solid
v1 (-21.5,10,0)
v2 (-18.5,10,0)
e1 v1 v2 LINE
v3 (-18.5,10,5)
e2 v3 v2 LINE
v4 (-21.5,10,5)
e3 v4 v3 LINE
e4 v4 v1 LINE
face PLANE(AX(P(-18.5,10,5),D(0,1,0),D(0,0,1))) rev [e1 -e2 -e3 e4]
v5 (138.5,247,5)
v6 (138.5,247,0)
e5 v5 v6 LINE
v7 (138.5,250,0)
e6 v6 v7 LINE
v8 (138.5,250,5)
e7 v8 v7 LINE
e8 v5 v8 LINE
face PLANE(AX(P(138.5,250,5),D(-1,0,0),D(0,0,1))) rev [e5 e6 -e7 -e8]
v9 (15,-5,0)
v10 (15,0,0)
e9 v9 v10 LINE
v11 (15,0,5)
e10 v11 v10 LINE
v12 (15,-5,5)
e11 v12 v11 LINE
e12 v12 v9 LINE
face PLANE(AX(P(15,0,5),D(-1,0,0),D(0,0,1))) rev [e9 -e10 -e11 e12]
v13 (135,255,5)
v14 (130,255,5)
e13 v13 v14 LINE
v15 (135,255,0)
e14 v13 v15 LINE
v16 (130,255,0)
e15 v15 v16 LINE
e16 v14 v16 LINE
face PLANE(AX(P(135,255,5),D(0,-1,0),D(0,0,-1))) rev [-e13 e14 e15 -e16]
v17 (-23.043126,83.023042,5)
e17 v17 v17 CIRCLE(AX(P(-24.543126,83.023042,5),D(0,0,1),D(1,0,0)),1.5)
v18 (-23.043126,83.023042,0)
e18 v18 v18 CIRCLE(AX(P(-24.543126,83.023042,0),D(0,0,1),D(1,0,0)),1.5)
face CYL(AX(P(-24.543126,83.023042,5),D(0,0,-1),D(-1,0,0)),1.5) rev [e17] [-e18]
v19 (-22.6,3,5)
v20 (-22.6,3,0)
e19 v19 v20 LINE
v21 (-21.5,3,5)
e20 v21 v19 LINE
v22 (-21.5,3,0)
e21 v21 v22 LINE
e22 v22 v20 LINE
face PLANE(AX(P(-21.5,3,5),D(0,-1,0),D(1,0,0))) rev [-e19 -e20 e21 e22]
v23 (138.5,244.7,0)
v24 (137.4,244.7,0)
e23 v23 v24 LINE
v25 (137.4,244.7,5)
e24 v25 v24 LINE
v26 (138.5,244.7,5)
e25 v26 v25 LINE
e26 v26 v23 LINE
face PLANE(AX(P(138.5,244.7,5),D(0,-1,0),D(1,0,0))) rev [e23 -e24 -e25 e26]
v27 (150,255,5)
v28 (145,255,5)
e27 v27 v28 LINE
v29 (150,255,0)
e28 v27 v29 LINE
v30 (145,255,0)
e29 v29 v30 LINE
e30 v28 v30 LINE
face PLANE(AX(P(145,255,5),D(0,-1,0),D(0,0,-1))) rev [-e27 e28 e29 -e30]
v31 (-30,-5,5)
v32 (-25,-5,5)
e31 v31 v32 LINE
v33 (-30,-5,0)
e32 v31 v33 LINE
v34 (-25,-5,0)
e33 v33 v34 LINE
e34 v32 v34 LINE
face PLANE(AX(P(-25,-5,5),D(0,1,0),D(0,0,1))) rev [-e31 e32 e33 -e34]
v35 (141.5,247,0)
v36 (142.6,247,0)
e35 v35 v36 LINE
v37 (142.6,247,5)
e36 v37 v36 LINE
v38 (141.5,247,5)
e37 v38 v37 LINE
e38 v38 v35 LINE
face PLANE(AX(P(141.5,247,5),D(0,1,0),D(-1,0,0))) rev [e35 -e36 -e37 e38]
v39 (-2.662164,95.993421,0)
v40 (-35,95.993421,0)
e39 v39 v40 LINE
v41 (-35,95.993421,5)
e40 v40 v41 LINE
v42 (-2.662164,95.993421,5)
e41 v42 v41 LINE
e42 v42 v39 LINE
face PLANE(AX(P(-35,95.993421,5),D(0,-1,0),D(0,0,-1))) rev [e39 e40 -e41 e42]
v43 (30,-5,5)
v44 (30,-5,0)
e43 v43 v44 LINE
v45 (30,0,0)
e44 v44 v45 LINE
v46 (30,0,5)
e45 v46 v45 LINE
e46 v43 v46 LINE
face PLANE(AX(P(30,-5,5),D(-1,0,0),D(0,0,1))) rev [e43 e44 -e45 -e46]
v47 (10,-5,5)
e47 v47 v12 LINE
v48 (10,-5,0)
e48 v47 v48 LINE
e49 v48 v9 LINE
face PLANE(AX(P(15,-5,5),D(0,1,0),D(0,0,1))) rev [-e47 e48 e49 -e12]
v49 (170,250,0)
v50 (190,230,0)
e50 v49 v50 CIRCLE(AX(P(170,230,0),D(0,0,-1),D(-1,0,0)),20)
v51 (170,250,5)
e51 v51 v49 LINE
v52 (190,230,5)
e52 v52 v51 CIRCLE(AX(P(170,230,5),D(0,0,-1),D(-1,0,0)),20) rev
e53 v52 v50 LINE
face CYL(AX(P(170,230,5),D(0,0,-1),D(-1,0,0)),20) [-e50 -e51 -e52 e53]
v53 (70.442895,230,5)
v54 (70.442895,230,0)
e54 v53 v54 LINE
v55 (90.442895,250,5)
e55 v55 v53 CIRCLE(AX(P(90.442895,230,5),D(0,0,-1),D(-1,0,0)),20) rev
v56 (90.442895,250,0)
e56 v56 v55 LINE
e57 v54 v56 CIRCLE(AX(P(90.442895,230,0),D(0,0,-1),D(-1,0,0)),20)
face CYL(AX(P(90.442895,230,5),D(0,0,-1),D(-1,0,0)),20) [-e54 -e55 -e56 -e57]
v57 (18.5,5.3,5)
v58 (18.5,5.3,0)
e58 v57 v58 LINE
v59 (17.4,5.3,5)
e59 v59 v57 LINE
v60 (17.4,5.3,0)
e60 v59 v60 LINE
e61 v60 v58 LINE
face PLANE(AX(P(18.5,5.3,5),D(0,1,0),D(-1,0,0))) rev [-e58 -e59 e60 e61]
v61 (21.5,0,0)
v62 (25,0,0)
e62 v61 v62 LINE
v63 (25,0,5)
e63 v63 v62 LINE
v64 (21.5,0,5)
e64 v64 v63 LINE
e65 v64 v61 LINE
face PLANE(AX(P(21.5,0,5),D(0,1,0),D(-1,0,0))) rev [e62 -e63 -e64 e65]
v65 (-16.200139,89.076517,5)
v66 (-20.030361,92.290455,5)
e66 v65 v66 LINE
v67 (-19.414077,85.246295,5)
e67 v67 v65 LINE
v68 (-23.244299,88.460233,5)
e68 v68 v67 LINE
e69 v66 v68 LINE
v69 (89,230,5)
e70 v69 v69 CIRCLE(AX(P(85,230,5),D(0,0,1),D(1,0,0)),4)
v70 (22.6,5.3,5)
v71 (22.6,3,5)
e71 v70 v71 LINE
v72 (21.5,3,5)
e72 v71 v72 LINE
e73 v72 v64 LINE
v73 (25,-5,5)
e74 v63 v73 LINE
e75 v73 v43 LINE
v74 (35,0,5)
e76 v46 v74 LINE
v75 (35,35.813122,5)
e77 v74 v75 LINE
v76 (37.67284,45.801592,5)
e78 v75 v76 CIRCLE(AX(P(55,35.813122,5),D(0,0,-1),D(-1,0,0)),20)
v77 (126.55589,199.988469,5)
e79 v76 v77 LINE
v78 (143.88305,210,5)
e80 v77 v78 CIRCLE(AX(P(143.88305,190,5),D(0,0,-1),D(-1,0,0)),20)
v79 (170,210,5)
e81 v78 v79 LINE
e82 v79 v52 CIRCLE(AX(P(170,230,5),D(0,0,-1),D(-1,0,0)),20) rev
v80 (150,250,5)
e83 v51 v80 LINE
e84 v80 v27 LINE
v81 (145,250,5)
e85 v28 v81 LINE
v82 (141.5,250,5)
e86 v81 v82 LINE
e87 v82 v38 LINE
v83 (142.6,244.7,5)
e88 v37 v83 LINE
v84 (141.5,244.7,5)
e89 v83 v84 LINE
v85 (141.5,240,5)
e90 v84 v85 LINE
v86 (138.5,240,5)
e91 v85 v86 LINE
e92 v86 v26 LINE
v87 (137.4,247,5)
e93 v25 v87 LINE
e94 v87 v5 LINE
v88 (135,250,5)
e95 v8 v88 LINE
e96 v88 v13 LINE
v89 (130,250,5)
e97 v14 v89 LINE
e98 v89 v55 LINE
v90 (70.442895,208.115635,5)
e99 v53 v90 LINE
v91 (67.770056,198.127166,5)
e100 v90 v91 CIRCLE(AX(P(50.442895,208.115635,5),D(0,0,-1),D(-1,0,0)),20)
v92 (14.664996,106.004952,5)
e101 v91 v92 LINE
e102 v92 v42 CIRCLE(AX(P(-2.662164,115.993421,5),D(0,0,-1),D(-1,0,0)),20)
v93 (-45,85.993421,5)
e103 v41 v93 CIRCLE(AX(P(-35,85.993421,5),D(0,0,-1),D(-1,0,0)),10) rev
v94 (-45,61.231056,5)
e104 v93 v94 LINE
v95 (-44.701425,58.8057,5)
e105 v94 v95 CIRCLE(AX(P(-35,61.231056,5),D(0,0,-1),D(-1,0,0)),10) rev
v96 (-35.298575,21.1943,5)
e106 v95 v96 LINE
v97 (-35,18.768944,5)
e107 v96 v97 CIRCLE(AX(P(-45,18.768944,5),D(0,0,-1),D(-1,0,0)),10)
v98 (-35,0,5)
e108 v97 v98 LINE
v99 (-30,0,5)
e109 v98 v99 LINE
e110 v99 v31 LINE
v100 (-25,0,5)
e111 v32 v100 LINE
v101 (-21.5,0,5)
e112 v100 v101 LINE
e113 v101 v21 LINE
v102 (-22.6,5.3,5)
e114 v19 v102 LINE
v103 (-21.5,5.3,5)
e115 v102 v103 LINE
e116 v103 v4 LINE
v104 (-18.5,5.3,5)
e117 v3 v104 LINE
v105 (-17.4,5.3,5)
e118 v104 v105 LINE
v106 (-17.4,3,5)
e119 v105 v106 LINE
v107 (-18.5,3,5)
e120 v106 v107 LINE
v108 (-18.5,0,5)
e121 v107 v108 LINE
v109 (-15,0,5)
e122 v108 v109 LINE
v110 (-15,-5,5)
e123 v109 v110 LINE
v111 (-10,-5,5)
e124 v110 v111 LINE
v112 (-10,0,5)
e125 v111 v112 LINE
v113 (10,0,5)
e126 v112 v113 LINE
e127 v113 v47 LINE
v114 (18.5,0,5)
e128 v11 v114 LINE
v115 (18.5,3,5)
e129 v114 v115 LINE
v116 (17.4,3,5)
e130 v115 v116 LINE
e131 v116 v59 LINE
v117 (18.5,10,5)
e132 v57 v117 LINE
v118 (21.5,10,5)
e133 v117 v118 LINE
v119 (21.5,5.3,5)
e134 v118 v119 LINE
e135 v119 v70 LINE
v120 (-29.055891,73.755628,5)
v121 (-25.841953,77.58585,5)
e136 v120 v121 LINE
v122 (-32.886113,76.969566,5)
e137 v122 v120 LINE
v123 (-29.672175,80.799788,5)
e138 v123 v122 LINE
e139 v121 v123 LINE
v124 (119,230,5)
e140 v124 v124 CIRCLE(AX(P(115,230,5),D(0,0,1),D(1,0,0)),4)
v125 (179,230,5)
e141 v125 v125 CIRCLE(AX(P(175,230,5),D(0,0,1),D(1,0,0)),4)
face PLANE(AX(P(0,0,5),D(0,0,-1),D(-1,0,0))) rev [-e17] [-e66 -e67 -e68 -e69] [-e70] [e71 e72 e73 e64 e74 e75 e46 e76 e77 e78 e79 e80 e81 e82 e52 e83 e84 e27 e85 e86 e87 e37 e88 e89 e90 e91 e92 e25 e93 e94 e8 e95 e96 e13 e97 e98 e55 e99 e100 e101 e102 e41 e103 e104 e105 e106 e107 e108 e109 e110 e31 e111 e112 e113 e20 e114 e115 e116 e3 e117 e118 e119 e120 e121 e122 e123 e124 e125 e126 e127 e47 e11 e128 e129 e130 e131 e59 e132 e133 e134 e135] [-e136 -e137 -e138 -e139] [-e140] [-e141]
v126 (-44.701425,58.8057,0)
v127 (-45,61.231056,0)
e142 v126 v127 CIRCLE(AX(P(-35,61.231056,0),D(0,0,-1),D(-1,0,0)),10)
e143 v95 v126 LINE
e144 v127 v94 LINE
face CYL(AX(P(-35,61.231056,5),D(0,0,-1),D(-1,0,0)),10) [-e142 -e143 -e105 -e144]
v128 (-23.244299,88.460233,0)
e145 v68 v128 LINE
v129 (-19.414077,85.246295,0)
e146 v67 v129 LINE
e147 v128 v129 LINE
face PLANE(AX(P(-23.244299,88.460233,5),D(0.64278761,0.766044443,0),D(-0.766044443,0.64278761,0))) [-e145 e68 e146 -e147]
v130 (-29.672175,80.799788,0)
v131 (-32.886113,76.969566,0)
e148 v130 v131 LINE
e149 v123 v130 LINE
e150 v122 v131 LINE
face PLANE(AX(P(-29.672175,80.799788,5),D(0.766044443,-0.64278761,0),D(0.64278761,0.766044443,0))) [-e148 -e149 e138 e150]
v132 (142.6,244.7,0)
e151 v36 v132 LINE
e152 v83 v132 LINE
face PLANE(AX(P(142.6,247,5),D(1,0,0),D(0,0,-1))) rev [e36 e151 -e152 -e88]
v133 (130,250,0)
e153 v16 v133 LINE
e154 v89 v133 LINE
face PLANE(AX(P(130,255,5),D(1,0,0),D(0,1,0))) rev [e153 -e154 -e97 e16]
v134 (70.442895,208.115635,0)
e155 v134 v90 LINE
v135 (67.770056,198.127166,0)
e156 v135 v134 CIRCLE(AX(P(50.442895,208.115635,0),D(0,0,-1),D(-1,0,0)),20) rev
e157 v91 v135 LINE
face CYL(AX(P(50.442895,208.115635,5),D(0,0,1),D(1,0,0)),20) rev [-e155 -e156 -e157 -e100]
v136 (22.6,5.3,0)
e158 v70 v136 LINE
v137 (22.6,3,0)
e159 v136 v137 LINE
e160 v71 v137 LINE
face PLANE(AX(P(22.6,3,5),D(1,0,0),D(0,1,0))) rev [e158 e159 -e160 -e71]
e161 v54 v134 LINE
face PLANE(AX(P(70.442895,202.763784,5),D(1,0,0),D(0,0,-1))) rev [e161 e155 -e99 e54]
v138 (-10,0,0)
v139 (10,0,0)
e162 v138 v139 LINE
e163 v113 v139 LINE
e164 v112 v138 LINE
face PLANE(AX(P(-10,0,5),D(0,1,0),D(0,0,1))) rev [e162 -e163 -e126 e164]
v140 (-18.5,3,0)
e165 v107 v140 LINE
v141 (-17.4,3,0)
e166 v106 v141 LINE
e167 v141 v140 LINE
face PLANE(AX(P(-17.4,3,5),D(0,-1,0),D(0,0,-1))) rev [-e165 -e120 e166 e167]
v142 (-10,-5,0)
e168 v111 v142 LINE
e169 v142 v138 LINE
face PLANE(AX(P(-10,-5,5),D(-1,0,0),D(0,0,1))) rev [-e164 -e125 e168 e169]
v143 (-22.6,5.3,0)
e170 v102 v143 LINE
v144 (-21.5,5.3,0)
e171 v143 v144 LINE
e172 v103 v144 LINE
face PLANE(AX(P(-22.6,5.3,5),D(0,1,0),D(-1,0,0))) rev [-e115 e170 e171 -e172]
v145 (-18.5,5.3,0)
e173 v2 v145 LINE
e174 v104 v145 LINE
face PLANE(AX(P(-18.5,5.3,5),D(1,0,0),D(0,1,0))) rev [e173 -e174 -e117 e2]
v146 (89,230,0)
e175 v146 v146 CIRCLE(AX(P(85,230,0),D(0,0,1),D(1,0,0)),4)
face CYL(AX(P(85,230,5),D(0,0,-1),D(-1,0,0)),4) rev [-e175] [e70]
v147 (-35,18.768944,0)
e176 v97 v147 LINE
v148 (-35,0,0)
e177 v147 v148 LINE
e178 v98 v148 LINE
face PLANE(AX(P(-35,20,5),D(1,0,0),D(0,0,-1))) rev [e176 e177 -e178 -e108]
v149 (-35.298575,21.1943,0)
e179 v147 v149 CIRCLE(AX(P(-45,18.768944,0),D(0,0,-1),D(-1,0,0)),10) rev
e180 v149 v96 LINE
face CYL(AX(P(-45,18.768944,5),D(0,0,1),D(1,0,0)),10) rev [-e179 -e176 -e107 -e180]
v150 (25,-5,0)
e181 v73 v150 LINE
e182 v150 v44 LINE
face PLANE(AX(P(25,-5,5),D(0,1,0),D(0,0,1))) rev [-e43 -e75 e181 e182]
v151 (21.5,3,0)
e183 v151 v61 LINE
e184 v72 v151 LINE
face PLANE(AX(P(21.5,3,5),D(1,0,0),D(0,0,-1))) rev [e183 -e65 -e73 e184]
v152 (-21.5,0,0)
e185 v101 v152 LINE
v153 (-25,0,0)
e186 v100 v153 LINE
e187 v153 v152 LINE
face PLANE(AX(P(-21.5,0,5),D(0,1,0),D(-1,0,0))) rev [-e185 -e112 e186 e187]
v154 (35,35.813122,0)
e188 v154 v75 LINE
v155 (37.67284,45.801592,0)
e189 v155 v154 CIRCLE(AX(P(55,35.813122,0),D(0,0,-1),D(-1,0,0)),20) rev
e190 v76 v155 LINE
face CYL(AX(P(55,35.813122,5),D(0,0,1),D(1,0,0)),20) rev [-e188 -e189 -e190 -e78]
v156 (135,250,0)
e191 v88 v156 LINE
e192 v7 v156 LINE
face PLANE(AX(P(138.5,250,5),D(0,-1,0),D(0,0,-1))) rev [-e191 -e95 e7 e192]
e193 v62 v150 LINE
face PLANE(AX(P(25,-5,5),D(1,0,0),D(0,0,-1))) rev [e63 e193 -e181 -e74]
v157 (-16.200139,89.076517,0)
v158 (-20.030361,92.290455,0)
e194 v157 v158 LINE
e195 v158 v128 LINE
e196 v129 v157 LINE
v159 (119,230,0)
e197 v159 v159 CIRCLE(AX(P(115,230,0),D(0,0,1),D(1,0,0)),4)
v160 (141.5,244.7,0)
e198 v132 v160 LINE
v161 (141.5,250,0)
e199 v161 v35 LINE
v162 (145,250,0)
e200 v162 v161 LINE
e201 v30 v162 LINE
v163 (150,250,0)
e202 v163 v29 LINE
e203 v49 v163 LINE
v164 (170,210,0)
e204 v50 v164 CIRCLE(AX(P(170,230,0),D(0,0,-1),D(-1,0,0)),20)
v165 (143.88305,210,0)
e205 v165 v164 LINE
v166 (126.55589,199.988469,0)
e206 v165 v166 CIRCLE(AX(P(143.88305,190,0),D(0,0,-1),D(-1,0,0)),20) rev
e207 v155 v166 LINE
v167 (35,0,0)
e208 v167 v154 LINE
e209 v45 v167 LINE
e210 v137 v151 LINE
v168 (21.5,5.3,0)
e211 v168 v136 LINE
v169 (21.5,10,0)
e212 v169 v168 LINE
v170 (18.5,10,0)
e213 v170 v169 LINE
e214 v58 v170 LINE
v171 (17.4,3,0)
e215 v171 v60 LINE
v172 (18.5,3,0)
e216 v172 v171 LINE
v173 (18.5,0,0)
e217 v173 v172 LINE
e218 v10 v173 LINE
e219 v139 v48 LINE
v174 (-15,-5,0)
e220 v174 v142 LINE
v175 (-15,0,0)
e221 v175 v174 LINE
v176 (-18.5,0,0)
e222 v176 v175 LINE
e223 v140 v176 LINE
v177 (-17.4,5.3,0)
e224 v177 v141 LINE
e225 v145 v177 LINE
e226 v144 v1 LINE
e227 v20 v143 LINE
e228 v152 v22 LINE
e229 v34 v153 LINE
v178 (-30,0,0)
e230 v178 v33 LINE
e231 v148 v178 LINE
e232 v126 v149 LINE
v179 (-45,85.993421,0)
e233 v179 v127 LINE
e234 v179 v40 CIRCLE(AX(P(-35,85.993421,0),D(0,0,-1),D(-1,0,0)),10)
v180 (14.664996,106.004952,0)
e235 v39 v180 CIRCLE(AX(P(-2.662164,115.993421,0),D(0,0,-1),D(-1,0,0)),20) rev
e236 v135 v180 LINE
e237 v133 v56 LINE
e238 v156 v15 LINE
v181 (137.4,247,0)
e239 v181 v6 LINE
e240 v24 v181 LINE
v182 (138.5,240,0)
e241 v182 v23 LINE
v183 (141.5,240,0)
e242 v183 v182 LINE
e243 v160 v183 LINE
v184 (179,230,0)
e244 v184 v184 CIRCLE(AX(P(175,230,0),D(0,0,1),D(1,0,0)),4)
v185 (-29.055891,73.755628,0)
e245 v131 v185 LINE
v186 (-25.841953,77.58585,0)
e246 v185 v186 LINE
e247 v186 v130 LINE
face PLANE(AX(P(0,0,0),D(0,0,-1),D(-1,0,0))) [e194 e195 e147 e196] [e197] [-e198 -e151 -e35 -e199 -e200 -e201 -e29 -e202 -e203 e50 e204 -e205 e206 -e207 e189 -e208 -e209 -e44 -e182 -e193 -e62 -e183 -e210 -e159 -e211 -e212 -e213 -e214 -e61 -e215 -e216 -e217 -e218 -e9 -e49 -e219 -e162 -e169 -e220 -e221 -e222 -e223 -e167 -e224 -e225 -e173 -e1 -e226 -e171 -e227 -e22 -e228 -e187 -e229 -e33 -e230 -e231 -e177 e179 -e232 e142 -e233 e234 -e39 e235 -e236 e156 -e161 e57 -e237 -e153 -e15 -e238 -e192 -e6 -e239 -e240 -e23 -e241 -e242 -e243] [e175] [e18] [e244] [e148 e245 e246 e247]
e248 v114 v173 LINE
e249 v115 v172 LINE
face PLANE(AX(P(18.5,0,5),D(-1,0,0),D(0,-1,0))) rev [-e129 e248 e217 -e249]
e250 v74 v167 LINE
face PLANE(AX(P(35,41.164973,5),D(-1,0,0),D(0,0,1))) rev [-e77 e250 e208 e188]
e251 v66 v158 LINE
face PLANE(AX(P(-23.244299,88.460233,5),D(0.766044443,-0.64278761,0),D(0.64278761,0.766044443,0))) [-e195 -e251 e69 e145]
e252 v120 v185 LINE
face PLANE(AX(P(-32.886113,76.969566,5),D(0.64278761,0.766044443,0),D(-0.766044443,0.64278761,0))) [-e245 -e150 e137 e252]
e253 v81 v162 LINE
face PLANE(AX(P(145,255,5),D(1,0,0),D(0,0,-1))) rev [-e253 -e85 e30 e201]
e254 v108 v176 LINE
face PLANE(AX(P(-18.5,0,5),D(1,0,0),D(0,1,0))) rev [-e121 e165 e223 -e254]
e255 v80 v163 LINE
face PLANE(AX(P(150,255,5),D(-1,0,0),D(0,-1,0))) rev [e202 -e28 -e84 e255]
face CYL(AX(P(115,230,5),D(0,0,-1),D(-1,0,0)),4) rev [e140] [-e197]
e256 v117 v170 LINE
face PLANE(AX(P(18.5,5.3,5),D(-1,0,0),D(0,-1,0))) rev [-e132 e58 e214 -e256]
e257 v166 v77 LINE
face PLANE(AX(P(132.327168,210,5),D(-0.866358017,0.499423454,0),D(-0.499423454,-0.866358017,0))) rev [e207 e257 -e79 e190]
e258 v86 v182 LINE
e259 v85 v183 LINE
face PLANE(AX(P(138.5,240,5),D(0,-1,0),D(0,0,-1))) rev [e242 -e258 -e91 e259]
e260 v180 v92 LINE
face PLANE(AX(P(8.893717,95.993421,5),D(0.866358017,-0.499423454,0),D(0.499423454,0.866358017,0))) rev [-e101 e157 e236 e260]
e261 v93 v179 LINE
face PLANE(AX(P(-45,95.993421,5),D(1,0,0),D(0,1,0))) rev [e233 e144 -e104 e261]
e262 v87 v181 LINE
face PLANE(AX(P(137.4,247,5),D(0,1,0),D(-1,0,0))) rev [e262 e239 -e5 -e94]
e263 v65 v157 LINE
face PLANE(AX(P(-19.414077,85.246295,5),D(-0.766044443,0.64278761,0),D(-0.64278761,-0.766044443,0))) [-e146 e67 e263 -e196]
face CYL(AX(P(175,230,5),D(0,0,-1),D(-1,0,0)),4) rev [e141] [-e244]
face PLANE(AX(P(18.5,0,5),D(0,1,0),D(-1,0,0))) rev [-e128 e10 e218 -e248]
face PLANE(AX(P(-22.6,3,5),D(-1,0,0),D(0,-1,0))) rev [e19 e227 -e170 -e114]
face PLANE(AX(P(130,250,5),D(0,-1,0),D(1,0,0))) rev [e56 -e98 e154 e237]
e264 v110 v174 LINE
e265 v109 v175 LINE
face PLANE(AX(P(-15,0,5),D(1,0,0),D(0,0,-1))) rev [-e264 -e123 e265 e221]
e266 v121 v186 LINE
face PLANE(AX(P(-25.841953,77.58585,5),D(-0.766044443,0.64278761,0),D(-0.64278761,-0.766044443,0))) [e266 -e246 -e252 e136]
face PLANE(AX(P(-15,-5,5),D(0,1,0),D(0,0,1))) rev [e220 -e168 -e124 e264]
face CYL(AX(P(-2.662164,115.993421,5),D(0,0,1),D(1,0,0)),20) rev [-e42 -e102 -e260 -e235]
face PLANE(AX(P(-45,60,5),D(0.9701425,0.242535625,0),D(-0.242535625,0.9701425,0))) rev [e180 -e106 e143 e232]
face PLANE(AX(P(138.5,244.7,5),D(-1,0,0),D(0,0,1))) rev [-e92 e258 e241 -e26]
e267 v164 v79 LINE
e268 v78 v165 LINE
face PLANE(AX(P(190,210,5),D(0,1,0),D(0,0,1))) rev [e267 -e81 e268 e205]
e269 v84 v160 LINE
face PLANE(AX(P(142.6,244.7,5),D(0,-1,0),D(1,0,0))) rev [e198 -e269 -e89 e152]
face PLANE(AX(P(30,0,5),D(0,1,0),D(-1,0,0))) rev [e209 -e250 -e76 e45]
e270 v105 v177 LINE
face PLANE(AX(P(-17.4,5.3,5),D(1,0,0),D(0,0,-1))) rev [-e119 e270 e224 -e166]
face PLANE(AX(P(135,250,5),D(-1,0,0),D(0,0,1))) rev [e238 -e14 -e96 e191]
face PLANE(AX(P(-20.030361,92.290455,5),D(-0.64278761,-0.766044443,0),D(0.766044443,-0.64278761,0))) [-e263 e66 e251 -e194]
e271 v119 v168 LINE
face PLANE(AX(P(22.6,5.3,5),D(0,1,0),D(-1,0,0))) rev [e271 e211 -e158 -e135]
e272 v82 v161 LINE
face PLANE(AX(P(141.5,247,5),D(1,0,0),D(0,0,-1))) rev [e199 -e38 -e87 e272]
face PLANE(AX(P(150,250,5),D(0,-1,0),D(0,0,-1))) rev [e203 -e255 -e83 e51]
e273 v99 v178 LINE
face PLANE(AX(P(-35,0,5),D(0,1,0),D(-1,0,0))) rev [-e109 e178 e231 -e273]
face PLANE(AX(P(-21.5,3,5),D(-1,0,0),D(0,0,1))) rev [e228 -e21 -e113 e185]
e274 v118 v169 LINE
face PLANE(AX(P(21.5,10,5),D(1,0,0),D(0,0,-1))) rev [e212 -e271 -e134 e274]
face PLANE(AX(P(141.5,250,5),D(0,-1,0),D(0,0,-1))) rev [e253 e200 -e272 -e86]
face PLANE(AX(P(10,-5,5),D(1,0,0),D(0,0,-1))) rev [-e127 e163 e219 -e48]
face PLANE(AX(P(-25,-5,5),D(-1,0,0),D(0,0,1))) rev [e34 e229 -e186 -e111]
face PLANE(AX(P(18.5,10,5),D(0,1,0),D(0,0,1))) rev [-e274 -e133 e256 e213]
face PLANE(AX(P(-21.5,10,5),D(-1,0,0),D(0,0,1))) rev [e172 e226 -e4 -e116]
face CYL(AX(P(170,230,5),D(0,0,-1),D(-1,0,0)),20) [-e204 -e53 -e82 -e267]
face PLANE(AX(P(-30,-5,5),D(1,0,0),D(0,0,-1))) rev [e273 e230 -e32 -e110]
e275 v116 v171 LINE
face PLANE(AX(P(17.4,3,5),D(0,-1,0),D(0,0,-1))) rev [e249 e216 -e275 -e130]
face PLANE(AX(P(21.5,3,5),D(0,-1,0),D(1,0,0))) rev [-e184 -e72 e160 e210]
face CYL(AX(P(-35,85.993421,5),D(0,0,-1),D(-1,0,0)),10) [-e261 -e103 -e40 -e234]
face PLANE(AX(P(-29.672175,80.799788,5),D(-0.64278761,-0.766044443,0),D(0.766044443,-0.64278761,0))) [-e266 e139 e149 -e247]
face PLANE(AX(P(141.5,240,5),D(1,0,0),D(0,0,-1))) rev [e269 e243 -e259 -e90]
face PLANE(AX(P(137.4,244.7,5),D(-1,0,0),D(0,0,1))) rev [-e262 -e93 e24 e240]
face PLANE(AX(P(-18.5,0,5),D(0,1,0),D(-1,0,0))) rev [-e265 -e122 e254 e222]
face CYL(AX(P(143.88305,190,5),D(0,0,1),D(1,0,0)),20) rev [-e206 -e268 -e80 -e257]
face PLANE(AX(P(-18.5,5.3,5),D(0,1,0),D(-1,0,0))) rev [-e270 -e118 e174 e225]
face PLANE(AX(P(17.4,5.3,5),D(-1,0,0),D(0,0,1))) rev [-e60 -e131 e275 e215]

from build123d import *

# Parameters (mm, degrees)
ESQUISSE1_R        = 4
ESQUISSE1_R_2      = 1.5
BOSS_EXTRU_1_DEPTH = 5
CONG_1_R           = 10
CONG_2_R           = 20


with BuildPart() as part:
    # Esquisse1 → Boss.-Extru.1 (new body)
    with BuildSketch(Plane.XY):
        Polygon((-21.5, 0), (-25, 0), (-25, -5), (-30, -5), (-30, 0), (-35, 0), (-35, 20), (-45, 60), (-45, 95.993420768), (-35, 95.993420768), (-10, 95.993420768), (8.893717408, 95.993420768), (70.442895342, 202.763784424), (70.442895342, 250), (97.672831982, 250), (130, 250), (130, 255), (135, 255), (135, 250), (138.5, 250), (138.5, 247), (137.4, 247), (137.4, 244.7), (138.5, 244.7), (138.5, 240), (141.5, 240), (141.5, 244.7), (142.6, 244.7), (142.6, 247), (141.5, 247), (141.5, 250), (145, 250), (145, 255), (150, 255), (150, 250), (190, 250), (190, 210), (132.327168018, 210), (35, 41.164972924), (35, 0), (30, 0), (30, -5), (25, -5), (25, 0), (21.5, 0), (21.5, 3), (22.6, 3), (22.6, 5.3), (21.5, 5.3), (21.5, 10), (18.5, 10), (18.5, 5.3), (17.4, 5.3), (17.4, 3), (18.5, 3), (18.5, 0), (15, 0), (15, -5), (10, -5), (10, 0), (-10, 0), (-10, -5), (-15, -5), (-15, 0), (-18.5, 0), (-18.5, 3), (-17.4, 3), (-17.4, 5.3), (-18.5, 5.3), (-18.5, 10), (-21.5, 10), (-21.5, 5.3), (-22.6, 5.3), (-22.6, 3), (-21.5, 3), align=None)
        with Locations((115, 230)):
            Circle(ESQUISSE1_R, mode=Mode.SUBTRACT)
        with Locations((175, 230)):
            Circle(ESQUISSE1_R, mode=Mode.SUBTRACT)
        with Locations((85, 230)):
            Circle(ESQUISSE1_R, mode=Mode.SUBTRACT)
        with Locations((-24.543125869, 83.023041686)):
            Circle(ESQUISSE1_R_2, mode=Mode.SUBTRACT)
        Polygon((-29.672175025, 80.799788495), (-32.886113073, 76.969566279), (-29.055890858, 73.755628231), (-25.841952809, 77.585850447), align=None, mode=Mode.SUBTRACT)
        Polygon((-23.244298928, 88.460232926), (-20.03036088, 92.290455142), (-16.200138664, 89.076517093), (-19.414076712, 85.246294878), align=None, mode=Mode.SUBTRACT)
    extrude(amount=BOSS_EXTRU_1_DEPTH)

    # Congé1
    cong_1_edges = [part.edges().sort_by_distance(p)[0] for p in [
        (-35, 20, 2.5),
        (-45, 60, 2.5),
        (-45, 95.993420768, 2.5),
    ]]
    fillet(cong_1_edges, radius=CONG_1_R)

    # Congé2
    cong_2_edges = [part.edges().sort_by_distance(p)[0] for p in [
        (35, 41.164972924, 2.5),
        (132.327168018, 210, 2.5),
        (190, 210, 2.5),
        (70.442895342, 250, 2.5),
        (190, 250, 2.5),
        (8.893717408, 95.993420768, 2.5),
        (70.442895342, 202.763784424, 2.5),
    ]]
    fillet(cong_2_edges, radius=CONG_2_R - 0.0001)  # a hair under: the kernel refuses the full size


solid = part.part
